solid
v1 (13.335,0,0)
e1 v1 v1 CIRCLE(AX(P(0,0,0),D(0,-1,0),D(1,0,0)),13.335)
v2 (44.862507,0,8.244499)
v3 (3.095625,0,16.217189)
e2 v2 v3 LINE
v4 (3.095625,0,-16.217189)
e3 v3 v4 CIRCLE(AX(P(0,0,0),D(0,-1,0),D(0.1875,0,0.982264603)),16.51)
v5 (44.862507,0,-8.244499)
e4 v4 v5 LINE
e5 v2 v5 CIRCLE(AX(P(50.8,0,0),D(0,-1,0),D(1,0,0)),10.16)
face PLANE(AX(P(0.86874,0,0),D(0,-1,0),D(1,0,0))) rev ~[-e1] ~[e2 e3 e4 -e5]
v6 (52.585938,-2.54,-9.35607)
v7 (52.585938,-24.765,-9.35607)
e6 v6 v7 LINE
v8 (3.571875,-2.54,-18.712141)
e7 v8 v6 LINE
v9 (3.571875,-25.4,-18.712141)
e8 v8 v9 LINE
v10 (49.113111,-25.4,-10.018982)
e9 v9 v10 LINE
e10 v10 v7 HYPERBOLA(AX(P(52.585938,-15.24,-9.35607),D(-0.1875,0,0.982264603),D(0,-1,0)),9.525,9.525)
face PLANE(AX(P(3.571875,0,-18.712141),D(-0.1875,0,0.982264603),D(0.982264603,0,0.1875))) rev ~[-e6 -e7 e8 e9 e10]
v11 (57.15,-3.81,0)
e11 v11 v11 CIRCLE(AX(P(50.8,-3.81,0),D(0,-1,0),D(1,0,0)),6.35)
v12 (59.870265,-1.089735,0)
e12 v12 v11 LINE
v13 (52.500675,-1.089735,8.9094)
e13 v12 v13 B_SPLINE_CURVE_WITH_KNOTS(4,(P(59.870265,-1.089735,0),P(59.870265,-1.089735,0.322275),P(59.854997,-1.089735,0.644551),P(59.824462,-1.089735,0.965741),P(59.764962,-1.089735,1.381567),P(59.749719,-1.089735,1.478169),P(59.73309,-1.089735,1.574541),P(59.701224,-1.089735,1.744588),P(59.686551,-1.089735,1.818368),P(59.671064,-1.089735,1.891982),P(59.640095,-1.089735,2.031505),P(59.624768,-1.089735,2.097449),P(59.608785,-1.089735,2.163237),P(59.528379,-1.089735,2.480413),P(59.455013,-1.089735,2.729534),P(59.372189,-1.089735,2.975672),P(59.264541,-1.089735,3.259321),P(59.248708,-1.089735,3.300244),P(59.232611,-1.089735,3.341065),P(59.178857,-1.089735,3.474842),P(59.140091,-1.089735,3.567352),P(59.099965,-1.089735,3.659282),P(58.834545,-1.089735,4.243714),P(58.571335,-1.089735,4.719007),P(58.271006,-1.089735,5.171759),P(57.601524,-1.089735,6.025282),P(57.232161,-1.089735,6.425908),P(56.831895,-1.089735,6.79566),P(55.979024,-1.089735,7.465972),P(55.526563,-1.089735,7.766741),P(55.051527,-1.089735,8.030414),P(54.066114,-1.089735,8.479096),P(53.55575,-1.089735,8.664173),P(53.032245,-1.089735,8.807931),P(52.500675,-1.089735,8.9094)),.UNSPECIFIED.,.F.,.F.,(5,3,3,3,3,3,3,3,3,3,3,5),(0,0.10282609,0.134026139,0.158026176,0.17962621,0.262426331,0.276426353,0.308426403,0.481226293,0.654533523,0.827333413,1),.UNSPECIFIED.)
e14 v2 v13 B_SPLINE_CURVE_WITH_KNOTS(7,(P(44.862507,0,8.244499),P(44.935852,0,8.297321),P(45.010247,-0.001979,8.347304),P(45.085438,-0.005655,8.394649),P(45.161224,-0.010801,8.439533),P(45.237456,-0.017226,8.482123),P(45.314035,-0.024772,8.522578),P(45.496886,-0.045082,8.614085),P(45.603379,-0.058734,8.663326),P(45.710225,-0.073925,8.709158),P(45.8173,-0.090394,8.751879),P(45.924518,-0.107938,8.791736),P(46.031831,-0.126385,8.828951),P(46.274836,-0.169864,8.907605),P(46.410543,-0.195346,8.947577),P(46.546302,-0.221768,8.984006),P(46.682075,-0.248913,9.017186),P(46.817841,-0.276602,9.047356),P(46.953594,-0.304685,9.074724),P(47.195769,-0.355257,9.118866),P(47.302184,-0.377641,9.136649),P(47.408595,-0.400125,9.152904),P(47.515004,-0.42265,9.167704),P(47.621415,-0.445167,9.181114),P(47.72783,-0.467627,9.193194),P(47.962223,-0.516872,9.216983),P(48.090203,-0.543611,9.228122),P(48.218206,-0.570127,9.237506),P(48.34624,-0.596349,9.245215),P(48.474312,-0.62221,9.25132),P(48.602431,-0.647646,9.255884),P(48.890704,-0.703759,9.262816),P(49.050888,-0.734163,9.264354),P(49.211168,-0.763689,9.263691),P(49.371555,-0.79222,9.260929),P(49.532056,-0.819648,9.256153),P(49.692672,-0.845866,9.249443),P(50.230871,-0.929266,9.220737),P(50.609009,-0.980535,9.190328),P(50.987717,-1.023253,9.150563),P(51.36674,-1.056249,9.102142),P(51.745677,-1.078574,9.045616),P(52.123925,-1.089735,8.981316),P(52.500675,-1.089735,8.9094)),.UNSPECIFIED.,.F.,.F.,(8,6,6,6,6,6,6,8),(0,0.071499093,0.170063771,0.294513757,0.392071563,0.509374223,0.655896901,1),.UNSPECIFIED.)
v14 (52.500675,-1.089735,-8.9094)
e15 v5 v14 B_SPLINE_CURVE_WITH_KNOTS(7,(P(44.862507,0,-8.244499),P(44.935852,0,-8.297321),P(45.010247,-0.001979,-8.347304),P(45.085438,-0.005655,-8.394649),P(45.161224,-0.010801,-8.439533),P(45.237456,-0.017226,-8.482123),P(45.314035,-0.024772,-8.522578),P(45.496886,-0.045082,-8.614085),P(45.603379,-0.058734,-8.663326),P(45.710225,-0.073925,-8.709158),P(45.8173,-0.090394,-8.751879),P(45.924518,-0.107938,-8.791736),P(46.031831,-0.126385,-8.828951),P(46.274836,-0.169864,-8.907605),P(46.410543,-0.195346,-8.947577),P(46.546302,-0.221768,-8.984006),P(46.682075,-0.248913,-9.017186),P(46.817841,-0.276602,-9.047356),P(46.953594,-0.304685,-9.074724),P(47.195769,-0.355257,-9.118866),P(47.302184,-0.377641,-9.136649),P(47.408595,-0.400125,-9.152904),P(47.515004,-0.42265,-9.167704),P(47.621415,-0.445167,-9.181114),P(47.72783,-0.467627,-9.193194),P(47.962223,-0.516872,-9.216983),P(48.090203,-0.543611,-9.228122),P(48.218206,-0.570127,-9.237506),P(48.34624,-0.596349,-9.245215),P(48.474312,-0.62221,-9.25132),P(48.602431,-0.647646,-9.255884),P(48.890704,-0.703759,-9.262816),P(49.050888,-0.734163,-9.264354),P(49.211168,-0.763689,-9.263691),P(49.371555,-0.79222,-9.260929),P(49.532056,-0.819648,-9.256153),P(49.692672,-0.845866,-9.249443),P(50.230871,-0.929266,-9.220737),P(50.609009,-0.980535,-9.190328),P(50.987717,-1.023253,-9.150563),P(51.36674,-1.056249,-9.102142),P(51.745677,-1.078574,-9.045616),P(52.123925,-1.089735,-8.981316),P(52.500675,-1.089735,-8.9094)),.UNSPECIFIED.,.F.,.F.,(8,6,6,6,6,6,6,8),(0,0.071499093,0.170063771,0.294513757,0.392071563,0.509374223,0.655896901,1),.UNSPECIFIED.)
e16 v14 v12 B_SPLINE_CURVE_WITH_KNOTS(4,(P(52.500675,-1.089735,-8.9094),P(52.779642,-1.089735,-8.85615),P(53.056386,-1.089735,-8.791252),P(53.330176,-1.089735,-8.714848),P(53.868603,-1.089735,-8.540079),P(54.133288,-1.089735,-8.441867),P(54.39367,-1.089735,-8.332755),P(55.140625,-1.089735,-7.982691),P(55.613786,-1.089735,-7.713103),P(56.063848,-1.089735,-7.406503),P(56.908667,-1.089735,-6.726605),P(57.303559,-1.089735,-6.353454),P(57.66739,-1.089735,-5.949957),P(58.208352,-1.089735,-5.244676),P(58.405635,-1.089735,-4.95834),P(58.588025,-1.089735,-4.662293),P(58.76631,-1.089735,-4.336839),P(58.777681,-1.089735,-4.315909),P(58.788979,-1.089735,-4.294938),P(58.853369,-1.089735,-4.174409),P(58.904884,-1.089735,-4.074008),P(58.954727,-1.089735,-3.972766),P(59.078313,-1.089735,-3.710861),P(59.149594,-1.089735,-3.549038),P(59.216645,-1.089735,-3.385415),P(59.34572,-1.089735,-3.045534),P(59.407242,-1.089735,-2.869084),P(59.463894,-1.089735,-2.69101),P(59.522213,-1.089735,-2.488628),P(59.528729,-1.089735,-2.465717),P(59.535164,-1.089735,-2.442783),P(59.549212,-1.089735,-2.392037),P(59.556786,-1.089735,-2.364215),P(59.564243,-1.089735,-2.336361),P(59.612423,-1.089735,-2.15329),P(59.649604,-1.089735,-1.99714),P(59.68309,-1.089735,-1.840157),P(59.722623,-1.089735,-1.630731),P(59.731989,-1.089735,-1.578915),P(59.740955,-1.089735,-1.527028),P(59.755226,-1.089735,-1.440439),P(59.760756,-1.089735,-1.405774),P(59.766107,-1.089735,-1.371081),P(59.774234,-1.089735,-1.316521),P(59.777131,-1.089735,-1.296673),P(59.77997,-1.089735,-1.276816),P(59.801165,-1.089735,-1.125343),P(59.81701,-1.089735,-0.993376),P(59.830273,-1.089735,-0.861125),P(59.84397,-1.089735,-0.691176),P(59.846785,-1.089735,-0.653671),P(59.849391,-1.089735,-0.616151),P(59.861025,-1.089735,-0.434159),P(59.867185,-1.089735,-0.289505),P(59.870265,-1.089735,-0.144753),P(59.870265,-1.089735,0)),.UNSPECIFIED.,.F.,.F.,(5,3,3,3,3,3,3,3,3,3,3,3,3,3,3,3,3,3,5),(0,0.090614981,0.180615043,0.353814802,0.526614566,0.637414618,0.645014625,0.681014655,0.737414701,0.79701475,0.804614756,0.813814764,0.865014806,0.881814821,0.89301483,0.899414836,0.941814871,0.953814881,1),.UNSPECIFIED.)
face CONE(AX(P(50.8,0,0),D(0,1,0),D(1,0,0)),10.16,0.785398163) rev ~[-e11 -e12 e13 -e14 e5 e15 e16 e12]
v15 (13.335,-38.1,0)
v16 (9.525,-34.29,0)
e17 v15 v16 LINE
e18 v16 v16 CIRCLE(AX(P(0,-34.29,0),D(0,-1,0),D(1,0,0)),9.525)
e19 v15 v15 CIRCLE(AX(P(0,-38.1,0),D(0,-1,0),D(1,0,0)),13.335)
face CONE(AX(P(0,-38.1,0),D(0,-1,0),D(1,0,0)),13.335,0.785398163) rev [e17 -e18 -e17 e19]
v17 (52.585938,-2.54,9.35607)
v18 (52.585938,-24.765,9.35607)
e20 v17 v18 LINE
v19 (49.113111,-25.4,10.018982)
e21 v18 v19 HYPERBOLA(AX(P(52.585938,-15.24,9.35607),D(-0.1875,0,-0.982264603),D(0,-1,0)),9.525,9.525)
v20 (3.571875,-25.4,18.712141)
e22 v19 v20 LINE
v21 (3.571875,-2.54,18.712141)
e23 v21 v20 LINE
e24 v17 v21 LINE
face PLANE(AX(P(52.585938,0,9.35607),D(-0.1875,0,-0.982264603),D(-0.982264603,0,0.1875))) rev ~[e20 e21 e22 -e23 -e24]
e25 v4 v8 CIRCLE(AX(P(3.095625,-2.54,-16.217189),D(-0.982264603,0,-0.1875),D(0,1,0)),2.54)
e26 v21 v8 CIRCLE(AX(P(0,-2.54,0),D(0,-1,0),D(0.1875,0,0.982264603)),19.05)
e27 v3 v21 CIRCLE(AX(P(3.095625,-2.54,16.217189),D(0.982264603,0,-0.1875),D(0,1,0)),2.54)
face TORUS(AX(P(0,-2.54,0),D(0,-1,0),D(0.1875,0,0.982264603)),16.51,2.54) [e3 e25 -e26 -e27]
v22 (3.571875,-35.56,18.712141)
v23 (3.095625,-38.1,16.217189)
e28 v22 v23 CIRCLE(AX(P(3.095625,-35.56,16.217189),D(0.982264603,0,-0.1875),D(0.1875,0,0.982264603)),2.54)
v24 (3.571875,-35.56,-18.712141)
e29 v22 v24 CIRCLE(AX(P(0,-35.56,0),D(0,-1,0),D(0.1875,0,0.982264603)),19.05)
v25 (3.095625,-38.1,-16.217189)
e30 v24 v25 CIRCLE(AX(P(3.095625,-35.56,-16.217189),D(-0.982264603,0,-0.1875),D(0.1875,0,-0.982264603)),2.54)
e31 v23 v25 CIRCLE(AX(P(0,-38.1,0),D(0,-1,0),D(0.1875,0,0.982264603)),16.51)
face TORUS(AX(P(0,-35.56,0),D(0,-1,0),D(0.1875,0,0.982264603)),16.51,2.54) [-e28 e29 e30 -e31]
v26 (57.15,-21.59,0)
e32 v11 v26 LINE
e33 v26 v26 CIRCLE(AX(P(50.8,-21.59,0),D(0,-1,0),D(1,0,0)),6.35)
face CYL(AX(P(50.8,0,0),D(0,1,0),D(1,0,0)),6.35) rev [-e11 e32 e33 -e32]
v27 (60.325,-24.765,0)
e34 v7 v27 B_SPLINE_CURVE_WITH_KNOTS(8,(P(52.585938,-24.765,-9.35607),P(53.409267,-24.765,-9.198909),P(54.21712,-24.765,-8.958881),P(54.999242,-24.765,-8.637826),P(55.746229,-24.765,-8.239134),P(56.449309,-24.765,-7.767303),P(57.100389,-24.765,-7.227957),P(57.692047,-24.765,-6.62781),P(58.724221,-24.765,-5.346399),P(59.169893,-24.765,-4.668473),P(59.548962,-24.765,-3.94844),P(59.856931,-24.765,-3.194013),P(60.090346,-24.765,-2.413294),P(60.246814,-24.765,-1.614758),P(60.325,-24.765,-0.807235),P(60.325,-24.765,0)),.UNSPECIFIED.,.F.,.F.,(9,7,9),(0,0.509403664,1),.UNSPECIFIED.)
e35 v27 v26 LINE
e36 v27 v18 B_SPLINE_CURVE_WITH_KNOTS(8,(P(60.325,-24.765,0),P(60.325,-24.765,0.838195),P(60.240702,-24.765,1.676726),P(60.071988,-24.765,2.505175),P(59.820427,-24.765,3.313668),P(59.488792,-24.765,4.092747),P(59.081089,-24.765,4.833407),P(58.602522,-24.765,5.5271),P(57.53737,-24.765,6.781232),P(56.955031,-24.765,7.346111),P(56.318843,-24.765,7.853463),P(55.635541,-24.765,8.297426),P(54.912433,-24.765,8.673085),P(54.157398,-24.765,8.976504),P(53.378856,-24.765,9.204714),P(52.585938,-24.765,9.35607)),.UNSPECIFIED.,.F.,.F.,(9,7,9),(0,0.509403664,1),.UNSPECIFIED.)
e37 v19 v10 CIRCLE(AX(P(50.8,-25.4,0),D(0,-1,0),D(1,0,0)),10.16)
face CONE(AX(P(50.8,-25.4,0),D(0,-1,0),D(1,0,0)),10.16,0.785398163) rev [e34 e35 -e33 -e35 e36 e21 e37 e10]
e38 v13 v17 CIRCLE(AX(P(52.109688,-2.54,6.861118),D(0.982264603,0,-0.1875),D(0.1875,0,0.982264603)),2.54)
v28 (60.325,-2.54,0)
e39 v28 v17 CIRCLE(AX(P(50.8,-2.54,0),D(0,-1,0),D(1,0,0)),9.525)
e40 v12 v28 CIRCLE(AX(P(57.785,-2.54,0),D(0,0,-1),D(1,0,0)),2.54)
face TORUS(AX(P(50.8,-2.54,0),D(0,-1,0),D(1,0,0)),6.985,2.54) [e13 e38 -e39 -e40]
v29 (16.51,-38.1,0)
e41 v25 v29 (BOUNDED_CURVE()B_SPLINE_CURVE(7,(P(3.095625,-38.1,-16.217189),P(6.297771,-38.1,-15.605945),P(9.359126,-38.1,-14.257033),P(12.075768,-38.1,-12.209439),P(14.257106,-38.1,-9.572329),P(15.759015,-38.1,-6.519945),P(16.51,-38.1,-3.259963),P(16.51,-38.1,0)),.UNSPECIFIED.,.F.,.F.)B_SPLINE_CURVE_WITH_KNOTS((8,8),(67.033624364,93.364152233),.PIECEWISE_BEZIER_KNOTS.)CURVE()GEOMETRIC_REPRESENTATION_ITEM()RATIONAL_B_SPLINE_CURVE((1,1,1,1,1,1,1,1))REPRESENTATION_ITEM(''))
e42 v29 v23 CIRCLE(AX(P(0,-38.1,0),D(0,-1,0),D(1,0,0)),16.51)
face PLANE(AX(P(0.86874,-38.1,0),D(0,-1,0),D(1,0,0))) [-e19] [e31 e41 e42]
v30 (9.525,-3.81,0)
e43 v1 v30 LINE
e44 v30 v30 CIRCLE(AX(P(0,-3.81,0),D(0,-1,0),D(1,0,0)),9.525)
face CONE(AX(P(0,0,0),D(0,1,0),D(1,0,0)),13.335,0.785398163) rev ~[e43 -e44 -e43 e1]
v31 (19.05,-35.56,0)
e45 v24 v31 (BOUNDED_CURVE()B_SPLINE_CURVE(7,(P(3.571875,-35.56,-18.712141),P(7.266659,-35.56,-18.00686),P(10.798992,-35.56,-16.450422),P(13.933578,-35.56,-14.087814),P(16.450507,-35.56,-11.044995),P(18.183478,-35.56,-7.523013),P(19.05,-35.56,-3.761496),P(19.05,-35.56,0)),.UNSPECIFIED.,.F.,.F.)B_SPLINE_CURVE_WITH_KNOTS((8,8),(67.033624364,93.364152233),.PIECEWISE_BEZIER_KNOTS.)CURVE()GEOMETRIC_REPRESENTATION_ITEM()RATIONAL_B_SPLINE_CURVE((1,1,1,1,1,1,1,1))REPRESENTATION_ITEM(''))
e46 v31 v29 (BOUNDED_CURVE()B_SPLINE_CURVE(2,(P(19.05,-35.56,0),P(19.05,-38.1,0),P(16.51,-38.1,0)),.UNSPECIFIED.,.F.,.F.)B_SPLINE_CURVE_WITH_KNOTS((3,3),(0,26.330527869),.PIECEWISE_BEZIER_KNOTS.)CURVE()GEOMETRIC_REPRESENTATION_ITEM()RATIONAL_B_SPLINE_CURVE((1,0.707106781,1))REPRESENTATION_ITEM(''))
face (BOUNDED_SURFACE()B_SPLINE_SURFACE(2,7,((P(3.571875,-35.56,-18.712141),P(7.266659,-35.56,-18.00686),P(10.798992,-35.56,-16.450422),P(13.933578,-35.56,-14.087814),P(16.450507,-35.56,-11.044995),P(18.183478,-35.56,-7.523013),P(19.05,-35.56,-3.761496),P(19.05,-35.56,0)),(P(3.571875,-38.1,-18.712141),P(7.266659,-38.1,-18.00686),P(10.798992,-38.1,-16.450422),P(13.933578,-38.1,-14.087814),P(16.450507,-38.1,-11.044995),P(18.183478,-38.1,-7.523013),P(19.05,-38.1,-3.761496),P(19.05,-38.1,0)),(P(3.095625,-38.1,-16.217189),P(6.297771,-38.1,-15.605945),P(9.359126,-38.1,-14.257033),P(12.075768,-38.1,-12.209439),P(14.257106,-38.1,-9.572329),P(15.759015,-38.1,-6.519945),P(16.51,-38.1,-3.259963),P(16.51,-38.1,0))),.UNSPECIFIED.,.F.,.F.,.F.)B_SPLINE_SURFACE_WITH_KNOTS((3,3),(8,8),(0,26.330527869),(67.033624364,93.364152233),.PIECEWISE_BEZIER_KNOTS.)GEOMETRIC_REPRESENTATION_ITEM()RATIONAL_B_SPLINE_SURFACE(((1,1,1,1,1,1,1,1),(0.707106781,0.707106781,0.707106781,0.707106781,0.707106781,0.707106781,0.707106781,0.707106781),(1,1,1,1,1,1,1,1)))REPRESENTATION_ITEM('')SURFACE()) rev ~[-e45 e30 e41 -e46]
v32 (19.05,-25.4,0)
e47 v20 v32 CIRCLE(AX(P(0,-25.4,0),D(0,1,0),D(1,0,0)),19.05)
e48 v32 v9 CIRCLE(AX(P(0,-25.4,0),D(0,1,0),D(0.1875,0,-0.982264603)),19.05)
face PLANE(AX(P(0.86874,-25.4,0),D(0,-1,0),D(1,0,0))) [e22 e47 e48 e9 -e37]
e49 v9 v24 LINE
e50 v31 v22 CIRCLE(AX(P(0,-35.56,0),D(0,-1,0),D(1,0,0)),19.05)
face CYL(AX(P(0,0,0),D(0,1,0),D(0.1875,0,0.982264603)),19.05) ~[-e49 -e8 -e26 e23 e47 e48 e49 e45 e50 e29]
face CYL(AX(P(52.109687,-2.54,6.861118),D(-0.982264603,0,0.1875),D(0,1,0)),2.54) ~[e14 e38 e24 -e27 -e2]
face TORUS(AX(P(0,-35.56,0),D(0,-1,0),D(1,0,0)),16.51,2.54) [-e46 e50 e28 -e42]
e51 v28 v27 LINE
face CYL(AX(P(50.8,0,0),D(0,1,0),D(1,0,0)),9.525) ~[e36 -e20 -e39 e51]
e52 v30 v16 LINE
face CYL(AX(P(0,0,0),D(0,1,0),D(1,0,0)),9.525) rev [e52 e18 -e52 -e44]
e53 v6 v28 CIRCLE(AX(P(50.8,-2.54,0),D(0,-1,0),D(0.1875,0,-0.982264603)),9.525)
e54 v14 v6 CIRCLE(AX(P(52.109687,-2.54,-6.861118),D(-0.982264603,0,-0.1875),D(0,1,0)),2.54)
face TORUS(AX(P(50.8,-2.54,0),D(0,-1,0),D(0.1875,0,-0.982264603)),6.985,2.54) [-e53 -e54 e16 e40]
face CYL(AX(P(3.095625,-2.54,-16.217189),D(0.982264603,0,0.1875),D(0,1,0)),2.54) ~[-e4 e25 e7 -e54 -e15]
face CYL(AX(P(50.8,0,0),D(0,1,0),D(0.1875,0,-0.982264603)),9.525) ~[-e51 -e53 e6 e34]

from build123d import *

# Parameters (mm, degrees)
F0_R     = 9.525
F0_R_2   = 6.35
F1_DEPTH = 25.4
F2_DEPTH = 38.1
F3_R     = 2.54


# Not quite as in the source:
# - a fillet or chamfer that OpenCascade refuses, or shapes differently, is made with other operations: its cross-section is extruded or revolved along the edge and cut away or added


with BuildPart() as f1:
    # F0 (on Front) → F1 (new body)
    with BuildSketch(Plane.XZ):
        with BuildLine():
            ThreePointArc((3.571875, -18.7121406842), (14.6790108446, -12.1420402167), (19.05, 0))
            ThreePointArc((19.05, 0), (14.6790108446, 12.1420402167), (3.571875, 18.7121406842))
            ThreePointArc((3.571875, 18.7121406842), (-19.05, 0), (3.571875, -18.7121406842))
        make_face()
        Circle(F0_R, mode=Mode.SUBTRACT)
        with BuildLine():
            ThreePointArc((3.571875, 18.7121406842), (14.6790108446, 12.1420402167), (19.05, 0))
            ThreePointArc((19.05, 0), (14.6790108446, -12.1420402167), (3.571875, -18.7121406842))
            Line((3.571875, -18.7121406842), (52.5859375, -9.3560703421))
            ThreePointArc((52.5859375, -9.3560703421), (41.275, 0), (52.5859375, 9.3560703421))
            Line((52.5859375, 9.3560703421), (3.571875, 18.7121406842))
        make_face()
        with BuildLine():
            ThreePointArc((60.325, 0), (58.1395054223, 6.0710201084), (52.5859375, 9.3560703421))
            ThreePointArc((52.5859375, 9.3560703421), (41.275, 0), (52.5859375, -9.3560703421))
            ThreePointArc((52.5859375, -9.3560703421), (58.1395054223, -6.0710201084), (60.325, 0))
        make_face()
        with Locations((50.8, 0)):
            Circle(F0_R_2, mode=Mode.SUBTRACT)
    extrude(amount=F1_DEPTH)

    # F0 (on Front) → F2 (join)
    with BuildSketch(Plane.XZ):
        with BuildLine():
            ThreePointArc((3.571875, -18.7121406842), (14.6790108446, -12.1420402167), (19.05, 0))
            ThreePointArc((19.05, 0), (14.6790108446, 12.1420402167), (3.571875, 18.7121406842))
            ThreePointArc((3.571875, 18.7121406842), (-19.05, 0), (3.571875, -18.7121406842))
        make_face()
        Circle(F0_R, mode=Mode.SUBTRACT)
    extrude(amount=F2_DEPTH)

    # F3
    f3_edges = [f1.edges().sort_by_distance(p)[0] for p in [
        (28.078906, 0, -14.034106),
        (-3.571875, -38.1, 18.712141),
    ]]
    fillet(f3_edges, radius=F3_R)

    # F4: chamfer of 3.81 on 4 edges, made by hand

    # F4_s1 → F4_t2 (revolve, cut)
    with BuildSketch(Plane.XY):
        Polygon((13.335, -38.1), (9.525, -34.29), (9.525, -38.1), align=None)
    revolve(axis=Axis((0, -38.1, 0), (0, -1, 0)), mode=Mode.SUBTRACT)

    # F4_s3 → F4_t4 (revolve, cut)
    with BuildSketch(Plane.XY):
        Polygon((60.96, -25.4), (57.15, -21.59), (57.15, -25.4), align=None)
    revolve(axis=Axis((50.8, -25.4, 0), (0, -1, 0)), mode=Mode.SUBTRACT)

    # F4_s5 → F4_t6 (revolve, cut)
    with BuildSketch(Plane.XY):
        Polygon((13.335, 0), (9.525, -3.81), (9.525, 0), align=None)
    revolve(axis=Axis((0, 0, 0), (0, -1, 0)), mode=Mode.SUBTRACT)

    # F4_s7 → F4_t8 (revolve, cut)
    with BuildSketch(Plane.XY):
        Polygon((60.96, 0), (57.15, -3.81), (57.15, 0), align=None)
    revolve(axis=Axis((50.8, 0, 0), (0, -1, 0)), mode=Mode.SUBTRACT)


solid = f1.part
